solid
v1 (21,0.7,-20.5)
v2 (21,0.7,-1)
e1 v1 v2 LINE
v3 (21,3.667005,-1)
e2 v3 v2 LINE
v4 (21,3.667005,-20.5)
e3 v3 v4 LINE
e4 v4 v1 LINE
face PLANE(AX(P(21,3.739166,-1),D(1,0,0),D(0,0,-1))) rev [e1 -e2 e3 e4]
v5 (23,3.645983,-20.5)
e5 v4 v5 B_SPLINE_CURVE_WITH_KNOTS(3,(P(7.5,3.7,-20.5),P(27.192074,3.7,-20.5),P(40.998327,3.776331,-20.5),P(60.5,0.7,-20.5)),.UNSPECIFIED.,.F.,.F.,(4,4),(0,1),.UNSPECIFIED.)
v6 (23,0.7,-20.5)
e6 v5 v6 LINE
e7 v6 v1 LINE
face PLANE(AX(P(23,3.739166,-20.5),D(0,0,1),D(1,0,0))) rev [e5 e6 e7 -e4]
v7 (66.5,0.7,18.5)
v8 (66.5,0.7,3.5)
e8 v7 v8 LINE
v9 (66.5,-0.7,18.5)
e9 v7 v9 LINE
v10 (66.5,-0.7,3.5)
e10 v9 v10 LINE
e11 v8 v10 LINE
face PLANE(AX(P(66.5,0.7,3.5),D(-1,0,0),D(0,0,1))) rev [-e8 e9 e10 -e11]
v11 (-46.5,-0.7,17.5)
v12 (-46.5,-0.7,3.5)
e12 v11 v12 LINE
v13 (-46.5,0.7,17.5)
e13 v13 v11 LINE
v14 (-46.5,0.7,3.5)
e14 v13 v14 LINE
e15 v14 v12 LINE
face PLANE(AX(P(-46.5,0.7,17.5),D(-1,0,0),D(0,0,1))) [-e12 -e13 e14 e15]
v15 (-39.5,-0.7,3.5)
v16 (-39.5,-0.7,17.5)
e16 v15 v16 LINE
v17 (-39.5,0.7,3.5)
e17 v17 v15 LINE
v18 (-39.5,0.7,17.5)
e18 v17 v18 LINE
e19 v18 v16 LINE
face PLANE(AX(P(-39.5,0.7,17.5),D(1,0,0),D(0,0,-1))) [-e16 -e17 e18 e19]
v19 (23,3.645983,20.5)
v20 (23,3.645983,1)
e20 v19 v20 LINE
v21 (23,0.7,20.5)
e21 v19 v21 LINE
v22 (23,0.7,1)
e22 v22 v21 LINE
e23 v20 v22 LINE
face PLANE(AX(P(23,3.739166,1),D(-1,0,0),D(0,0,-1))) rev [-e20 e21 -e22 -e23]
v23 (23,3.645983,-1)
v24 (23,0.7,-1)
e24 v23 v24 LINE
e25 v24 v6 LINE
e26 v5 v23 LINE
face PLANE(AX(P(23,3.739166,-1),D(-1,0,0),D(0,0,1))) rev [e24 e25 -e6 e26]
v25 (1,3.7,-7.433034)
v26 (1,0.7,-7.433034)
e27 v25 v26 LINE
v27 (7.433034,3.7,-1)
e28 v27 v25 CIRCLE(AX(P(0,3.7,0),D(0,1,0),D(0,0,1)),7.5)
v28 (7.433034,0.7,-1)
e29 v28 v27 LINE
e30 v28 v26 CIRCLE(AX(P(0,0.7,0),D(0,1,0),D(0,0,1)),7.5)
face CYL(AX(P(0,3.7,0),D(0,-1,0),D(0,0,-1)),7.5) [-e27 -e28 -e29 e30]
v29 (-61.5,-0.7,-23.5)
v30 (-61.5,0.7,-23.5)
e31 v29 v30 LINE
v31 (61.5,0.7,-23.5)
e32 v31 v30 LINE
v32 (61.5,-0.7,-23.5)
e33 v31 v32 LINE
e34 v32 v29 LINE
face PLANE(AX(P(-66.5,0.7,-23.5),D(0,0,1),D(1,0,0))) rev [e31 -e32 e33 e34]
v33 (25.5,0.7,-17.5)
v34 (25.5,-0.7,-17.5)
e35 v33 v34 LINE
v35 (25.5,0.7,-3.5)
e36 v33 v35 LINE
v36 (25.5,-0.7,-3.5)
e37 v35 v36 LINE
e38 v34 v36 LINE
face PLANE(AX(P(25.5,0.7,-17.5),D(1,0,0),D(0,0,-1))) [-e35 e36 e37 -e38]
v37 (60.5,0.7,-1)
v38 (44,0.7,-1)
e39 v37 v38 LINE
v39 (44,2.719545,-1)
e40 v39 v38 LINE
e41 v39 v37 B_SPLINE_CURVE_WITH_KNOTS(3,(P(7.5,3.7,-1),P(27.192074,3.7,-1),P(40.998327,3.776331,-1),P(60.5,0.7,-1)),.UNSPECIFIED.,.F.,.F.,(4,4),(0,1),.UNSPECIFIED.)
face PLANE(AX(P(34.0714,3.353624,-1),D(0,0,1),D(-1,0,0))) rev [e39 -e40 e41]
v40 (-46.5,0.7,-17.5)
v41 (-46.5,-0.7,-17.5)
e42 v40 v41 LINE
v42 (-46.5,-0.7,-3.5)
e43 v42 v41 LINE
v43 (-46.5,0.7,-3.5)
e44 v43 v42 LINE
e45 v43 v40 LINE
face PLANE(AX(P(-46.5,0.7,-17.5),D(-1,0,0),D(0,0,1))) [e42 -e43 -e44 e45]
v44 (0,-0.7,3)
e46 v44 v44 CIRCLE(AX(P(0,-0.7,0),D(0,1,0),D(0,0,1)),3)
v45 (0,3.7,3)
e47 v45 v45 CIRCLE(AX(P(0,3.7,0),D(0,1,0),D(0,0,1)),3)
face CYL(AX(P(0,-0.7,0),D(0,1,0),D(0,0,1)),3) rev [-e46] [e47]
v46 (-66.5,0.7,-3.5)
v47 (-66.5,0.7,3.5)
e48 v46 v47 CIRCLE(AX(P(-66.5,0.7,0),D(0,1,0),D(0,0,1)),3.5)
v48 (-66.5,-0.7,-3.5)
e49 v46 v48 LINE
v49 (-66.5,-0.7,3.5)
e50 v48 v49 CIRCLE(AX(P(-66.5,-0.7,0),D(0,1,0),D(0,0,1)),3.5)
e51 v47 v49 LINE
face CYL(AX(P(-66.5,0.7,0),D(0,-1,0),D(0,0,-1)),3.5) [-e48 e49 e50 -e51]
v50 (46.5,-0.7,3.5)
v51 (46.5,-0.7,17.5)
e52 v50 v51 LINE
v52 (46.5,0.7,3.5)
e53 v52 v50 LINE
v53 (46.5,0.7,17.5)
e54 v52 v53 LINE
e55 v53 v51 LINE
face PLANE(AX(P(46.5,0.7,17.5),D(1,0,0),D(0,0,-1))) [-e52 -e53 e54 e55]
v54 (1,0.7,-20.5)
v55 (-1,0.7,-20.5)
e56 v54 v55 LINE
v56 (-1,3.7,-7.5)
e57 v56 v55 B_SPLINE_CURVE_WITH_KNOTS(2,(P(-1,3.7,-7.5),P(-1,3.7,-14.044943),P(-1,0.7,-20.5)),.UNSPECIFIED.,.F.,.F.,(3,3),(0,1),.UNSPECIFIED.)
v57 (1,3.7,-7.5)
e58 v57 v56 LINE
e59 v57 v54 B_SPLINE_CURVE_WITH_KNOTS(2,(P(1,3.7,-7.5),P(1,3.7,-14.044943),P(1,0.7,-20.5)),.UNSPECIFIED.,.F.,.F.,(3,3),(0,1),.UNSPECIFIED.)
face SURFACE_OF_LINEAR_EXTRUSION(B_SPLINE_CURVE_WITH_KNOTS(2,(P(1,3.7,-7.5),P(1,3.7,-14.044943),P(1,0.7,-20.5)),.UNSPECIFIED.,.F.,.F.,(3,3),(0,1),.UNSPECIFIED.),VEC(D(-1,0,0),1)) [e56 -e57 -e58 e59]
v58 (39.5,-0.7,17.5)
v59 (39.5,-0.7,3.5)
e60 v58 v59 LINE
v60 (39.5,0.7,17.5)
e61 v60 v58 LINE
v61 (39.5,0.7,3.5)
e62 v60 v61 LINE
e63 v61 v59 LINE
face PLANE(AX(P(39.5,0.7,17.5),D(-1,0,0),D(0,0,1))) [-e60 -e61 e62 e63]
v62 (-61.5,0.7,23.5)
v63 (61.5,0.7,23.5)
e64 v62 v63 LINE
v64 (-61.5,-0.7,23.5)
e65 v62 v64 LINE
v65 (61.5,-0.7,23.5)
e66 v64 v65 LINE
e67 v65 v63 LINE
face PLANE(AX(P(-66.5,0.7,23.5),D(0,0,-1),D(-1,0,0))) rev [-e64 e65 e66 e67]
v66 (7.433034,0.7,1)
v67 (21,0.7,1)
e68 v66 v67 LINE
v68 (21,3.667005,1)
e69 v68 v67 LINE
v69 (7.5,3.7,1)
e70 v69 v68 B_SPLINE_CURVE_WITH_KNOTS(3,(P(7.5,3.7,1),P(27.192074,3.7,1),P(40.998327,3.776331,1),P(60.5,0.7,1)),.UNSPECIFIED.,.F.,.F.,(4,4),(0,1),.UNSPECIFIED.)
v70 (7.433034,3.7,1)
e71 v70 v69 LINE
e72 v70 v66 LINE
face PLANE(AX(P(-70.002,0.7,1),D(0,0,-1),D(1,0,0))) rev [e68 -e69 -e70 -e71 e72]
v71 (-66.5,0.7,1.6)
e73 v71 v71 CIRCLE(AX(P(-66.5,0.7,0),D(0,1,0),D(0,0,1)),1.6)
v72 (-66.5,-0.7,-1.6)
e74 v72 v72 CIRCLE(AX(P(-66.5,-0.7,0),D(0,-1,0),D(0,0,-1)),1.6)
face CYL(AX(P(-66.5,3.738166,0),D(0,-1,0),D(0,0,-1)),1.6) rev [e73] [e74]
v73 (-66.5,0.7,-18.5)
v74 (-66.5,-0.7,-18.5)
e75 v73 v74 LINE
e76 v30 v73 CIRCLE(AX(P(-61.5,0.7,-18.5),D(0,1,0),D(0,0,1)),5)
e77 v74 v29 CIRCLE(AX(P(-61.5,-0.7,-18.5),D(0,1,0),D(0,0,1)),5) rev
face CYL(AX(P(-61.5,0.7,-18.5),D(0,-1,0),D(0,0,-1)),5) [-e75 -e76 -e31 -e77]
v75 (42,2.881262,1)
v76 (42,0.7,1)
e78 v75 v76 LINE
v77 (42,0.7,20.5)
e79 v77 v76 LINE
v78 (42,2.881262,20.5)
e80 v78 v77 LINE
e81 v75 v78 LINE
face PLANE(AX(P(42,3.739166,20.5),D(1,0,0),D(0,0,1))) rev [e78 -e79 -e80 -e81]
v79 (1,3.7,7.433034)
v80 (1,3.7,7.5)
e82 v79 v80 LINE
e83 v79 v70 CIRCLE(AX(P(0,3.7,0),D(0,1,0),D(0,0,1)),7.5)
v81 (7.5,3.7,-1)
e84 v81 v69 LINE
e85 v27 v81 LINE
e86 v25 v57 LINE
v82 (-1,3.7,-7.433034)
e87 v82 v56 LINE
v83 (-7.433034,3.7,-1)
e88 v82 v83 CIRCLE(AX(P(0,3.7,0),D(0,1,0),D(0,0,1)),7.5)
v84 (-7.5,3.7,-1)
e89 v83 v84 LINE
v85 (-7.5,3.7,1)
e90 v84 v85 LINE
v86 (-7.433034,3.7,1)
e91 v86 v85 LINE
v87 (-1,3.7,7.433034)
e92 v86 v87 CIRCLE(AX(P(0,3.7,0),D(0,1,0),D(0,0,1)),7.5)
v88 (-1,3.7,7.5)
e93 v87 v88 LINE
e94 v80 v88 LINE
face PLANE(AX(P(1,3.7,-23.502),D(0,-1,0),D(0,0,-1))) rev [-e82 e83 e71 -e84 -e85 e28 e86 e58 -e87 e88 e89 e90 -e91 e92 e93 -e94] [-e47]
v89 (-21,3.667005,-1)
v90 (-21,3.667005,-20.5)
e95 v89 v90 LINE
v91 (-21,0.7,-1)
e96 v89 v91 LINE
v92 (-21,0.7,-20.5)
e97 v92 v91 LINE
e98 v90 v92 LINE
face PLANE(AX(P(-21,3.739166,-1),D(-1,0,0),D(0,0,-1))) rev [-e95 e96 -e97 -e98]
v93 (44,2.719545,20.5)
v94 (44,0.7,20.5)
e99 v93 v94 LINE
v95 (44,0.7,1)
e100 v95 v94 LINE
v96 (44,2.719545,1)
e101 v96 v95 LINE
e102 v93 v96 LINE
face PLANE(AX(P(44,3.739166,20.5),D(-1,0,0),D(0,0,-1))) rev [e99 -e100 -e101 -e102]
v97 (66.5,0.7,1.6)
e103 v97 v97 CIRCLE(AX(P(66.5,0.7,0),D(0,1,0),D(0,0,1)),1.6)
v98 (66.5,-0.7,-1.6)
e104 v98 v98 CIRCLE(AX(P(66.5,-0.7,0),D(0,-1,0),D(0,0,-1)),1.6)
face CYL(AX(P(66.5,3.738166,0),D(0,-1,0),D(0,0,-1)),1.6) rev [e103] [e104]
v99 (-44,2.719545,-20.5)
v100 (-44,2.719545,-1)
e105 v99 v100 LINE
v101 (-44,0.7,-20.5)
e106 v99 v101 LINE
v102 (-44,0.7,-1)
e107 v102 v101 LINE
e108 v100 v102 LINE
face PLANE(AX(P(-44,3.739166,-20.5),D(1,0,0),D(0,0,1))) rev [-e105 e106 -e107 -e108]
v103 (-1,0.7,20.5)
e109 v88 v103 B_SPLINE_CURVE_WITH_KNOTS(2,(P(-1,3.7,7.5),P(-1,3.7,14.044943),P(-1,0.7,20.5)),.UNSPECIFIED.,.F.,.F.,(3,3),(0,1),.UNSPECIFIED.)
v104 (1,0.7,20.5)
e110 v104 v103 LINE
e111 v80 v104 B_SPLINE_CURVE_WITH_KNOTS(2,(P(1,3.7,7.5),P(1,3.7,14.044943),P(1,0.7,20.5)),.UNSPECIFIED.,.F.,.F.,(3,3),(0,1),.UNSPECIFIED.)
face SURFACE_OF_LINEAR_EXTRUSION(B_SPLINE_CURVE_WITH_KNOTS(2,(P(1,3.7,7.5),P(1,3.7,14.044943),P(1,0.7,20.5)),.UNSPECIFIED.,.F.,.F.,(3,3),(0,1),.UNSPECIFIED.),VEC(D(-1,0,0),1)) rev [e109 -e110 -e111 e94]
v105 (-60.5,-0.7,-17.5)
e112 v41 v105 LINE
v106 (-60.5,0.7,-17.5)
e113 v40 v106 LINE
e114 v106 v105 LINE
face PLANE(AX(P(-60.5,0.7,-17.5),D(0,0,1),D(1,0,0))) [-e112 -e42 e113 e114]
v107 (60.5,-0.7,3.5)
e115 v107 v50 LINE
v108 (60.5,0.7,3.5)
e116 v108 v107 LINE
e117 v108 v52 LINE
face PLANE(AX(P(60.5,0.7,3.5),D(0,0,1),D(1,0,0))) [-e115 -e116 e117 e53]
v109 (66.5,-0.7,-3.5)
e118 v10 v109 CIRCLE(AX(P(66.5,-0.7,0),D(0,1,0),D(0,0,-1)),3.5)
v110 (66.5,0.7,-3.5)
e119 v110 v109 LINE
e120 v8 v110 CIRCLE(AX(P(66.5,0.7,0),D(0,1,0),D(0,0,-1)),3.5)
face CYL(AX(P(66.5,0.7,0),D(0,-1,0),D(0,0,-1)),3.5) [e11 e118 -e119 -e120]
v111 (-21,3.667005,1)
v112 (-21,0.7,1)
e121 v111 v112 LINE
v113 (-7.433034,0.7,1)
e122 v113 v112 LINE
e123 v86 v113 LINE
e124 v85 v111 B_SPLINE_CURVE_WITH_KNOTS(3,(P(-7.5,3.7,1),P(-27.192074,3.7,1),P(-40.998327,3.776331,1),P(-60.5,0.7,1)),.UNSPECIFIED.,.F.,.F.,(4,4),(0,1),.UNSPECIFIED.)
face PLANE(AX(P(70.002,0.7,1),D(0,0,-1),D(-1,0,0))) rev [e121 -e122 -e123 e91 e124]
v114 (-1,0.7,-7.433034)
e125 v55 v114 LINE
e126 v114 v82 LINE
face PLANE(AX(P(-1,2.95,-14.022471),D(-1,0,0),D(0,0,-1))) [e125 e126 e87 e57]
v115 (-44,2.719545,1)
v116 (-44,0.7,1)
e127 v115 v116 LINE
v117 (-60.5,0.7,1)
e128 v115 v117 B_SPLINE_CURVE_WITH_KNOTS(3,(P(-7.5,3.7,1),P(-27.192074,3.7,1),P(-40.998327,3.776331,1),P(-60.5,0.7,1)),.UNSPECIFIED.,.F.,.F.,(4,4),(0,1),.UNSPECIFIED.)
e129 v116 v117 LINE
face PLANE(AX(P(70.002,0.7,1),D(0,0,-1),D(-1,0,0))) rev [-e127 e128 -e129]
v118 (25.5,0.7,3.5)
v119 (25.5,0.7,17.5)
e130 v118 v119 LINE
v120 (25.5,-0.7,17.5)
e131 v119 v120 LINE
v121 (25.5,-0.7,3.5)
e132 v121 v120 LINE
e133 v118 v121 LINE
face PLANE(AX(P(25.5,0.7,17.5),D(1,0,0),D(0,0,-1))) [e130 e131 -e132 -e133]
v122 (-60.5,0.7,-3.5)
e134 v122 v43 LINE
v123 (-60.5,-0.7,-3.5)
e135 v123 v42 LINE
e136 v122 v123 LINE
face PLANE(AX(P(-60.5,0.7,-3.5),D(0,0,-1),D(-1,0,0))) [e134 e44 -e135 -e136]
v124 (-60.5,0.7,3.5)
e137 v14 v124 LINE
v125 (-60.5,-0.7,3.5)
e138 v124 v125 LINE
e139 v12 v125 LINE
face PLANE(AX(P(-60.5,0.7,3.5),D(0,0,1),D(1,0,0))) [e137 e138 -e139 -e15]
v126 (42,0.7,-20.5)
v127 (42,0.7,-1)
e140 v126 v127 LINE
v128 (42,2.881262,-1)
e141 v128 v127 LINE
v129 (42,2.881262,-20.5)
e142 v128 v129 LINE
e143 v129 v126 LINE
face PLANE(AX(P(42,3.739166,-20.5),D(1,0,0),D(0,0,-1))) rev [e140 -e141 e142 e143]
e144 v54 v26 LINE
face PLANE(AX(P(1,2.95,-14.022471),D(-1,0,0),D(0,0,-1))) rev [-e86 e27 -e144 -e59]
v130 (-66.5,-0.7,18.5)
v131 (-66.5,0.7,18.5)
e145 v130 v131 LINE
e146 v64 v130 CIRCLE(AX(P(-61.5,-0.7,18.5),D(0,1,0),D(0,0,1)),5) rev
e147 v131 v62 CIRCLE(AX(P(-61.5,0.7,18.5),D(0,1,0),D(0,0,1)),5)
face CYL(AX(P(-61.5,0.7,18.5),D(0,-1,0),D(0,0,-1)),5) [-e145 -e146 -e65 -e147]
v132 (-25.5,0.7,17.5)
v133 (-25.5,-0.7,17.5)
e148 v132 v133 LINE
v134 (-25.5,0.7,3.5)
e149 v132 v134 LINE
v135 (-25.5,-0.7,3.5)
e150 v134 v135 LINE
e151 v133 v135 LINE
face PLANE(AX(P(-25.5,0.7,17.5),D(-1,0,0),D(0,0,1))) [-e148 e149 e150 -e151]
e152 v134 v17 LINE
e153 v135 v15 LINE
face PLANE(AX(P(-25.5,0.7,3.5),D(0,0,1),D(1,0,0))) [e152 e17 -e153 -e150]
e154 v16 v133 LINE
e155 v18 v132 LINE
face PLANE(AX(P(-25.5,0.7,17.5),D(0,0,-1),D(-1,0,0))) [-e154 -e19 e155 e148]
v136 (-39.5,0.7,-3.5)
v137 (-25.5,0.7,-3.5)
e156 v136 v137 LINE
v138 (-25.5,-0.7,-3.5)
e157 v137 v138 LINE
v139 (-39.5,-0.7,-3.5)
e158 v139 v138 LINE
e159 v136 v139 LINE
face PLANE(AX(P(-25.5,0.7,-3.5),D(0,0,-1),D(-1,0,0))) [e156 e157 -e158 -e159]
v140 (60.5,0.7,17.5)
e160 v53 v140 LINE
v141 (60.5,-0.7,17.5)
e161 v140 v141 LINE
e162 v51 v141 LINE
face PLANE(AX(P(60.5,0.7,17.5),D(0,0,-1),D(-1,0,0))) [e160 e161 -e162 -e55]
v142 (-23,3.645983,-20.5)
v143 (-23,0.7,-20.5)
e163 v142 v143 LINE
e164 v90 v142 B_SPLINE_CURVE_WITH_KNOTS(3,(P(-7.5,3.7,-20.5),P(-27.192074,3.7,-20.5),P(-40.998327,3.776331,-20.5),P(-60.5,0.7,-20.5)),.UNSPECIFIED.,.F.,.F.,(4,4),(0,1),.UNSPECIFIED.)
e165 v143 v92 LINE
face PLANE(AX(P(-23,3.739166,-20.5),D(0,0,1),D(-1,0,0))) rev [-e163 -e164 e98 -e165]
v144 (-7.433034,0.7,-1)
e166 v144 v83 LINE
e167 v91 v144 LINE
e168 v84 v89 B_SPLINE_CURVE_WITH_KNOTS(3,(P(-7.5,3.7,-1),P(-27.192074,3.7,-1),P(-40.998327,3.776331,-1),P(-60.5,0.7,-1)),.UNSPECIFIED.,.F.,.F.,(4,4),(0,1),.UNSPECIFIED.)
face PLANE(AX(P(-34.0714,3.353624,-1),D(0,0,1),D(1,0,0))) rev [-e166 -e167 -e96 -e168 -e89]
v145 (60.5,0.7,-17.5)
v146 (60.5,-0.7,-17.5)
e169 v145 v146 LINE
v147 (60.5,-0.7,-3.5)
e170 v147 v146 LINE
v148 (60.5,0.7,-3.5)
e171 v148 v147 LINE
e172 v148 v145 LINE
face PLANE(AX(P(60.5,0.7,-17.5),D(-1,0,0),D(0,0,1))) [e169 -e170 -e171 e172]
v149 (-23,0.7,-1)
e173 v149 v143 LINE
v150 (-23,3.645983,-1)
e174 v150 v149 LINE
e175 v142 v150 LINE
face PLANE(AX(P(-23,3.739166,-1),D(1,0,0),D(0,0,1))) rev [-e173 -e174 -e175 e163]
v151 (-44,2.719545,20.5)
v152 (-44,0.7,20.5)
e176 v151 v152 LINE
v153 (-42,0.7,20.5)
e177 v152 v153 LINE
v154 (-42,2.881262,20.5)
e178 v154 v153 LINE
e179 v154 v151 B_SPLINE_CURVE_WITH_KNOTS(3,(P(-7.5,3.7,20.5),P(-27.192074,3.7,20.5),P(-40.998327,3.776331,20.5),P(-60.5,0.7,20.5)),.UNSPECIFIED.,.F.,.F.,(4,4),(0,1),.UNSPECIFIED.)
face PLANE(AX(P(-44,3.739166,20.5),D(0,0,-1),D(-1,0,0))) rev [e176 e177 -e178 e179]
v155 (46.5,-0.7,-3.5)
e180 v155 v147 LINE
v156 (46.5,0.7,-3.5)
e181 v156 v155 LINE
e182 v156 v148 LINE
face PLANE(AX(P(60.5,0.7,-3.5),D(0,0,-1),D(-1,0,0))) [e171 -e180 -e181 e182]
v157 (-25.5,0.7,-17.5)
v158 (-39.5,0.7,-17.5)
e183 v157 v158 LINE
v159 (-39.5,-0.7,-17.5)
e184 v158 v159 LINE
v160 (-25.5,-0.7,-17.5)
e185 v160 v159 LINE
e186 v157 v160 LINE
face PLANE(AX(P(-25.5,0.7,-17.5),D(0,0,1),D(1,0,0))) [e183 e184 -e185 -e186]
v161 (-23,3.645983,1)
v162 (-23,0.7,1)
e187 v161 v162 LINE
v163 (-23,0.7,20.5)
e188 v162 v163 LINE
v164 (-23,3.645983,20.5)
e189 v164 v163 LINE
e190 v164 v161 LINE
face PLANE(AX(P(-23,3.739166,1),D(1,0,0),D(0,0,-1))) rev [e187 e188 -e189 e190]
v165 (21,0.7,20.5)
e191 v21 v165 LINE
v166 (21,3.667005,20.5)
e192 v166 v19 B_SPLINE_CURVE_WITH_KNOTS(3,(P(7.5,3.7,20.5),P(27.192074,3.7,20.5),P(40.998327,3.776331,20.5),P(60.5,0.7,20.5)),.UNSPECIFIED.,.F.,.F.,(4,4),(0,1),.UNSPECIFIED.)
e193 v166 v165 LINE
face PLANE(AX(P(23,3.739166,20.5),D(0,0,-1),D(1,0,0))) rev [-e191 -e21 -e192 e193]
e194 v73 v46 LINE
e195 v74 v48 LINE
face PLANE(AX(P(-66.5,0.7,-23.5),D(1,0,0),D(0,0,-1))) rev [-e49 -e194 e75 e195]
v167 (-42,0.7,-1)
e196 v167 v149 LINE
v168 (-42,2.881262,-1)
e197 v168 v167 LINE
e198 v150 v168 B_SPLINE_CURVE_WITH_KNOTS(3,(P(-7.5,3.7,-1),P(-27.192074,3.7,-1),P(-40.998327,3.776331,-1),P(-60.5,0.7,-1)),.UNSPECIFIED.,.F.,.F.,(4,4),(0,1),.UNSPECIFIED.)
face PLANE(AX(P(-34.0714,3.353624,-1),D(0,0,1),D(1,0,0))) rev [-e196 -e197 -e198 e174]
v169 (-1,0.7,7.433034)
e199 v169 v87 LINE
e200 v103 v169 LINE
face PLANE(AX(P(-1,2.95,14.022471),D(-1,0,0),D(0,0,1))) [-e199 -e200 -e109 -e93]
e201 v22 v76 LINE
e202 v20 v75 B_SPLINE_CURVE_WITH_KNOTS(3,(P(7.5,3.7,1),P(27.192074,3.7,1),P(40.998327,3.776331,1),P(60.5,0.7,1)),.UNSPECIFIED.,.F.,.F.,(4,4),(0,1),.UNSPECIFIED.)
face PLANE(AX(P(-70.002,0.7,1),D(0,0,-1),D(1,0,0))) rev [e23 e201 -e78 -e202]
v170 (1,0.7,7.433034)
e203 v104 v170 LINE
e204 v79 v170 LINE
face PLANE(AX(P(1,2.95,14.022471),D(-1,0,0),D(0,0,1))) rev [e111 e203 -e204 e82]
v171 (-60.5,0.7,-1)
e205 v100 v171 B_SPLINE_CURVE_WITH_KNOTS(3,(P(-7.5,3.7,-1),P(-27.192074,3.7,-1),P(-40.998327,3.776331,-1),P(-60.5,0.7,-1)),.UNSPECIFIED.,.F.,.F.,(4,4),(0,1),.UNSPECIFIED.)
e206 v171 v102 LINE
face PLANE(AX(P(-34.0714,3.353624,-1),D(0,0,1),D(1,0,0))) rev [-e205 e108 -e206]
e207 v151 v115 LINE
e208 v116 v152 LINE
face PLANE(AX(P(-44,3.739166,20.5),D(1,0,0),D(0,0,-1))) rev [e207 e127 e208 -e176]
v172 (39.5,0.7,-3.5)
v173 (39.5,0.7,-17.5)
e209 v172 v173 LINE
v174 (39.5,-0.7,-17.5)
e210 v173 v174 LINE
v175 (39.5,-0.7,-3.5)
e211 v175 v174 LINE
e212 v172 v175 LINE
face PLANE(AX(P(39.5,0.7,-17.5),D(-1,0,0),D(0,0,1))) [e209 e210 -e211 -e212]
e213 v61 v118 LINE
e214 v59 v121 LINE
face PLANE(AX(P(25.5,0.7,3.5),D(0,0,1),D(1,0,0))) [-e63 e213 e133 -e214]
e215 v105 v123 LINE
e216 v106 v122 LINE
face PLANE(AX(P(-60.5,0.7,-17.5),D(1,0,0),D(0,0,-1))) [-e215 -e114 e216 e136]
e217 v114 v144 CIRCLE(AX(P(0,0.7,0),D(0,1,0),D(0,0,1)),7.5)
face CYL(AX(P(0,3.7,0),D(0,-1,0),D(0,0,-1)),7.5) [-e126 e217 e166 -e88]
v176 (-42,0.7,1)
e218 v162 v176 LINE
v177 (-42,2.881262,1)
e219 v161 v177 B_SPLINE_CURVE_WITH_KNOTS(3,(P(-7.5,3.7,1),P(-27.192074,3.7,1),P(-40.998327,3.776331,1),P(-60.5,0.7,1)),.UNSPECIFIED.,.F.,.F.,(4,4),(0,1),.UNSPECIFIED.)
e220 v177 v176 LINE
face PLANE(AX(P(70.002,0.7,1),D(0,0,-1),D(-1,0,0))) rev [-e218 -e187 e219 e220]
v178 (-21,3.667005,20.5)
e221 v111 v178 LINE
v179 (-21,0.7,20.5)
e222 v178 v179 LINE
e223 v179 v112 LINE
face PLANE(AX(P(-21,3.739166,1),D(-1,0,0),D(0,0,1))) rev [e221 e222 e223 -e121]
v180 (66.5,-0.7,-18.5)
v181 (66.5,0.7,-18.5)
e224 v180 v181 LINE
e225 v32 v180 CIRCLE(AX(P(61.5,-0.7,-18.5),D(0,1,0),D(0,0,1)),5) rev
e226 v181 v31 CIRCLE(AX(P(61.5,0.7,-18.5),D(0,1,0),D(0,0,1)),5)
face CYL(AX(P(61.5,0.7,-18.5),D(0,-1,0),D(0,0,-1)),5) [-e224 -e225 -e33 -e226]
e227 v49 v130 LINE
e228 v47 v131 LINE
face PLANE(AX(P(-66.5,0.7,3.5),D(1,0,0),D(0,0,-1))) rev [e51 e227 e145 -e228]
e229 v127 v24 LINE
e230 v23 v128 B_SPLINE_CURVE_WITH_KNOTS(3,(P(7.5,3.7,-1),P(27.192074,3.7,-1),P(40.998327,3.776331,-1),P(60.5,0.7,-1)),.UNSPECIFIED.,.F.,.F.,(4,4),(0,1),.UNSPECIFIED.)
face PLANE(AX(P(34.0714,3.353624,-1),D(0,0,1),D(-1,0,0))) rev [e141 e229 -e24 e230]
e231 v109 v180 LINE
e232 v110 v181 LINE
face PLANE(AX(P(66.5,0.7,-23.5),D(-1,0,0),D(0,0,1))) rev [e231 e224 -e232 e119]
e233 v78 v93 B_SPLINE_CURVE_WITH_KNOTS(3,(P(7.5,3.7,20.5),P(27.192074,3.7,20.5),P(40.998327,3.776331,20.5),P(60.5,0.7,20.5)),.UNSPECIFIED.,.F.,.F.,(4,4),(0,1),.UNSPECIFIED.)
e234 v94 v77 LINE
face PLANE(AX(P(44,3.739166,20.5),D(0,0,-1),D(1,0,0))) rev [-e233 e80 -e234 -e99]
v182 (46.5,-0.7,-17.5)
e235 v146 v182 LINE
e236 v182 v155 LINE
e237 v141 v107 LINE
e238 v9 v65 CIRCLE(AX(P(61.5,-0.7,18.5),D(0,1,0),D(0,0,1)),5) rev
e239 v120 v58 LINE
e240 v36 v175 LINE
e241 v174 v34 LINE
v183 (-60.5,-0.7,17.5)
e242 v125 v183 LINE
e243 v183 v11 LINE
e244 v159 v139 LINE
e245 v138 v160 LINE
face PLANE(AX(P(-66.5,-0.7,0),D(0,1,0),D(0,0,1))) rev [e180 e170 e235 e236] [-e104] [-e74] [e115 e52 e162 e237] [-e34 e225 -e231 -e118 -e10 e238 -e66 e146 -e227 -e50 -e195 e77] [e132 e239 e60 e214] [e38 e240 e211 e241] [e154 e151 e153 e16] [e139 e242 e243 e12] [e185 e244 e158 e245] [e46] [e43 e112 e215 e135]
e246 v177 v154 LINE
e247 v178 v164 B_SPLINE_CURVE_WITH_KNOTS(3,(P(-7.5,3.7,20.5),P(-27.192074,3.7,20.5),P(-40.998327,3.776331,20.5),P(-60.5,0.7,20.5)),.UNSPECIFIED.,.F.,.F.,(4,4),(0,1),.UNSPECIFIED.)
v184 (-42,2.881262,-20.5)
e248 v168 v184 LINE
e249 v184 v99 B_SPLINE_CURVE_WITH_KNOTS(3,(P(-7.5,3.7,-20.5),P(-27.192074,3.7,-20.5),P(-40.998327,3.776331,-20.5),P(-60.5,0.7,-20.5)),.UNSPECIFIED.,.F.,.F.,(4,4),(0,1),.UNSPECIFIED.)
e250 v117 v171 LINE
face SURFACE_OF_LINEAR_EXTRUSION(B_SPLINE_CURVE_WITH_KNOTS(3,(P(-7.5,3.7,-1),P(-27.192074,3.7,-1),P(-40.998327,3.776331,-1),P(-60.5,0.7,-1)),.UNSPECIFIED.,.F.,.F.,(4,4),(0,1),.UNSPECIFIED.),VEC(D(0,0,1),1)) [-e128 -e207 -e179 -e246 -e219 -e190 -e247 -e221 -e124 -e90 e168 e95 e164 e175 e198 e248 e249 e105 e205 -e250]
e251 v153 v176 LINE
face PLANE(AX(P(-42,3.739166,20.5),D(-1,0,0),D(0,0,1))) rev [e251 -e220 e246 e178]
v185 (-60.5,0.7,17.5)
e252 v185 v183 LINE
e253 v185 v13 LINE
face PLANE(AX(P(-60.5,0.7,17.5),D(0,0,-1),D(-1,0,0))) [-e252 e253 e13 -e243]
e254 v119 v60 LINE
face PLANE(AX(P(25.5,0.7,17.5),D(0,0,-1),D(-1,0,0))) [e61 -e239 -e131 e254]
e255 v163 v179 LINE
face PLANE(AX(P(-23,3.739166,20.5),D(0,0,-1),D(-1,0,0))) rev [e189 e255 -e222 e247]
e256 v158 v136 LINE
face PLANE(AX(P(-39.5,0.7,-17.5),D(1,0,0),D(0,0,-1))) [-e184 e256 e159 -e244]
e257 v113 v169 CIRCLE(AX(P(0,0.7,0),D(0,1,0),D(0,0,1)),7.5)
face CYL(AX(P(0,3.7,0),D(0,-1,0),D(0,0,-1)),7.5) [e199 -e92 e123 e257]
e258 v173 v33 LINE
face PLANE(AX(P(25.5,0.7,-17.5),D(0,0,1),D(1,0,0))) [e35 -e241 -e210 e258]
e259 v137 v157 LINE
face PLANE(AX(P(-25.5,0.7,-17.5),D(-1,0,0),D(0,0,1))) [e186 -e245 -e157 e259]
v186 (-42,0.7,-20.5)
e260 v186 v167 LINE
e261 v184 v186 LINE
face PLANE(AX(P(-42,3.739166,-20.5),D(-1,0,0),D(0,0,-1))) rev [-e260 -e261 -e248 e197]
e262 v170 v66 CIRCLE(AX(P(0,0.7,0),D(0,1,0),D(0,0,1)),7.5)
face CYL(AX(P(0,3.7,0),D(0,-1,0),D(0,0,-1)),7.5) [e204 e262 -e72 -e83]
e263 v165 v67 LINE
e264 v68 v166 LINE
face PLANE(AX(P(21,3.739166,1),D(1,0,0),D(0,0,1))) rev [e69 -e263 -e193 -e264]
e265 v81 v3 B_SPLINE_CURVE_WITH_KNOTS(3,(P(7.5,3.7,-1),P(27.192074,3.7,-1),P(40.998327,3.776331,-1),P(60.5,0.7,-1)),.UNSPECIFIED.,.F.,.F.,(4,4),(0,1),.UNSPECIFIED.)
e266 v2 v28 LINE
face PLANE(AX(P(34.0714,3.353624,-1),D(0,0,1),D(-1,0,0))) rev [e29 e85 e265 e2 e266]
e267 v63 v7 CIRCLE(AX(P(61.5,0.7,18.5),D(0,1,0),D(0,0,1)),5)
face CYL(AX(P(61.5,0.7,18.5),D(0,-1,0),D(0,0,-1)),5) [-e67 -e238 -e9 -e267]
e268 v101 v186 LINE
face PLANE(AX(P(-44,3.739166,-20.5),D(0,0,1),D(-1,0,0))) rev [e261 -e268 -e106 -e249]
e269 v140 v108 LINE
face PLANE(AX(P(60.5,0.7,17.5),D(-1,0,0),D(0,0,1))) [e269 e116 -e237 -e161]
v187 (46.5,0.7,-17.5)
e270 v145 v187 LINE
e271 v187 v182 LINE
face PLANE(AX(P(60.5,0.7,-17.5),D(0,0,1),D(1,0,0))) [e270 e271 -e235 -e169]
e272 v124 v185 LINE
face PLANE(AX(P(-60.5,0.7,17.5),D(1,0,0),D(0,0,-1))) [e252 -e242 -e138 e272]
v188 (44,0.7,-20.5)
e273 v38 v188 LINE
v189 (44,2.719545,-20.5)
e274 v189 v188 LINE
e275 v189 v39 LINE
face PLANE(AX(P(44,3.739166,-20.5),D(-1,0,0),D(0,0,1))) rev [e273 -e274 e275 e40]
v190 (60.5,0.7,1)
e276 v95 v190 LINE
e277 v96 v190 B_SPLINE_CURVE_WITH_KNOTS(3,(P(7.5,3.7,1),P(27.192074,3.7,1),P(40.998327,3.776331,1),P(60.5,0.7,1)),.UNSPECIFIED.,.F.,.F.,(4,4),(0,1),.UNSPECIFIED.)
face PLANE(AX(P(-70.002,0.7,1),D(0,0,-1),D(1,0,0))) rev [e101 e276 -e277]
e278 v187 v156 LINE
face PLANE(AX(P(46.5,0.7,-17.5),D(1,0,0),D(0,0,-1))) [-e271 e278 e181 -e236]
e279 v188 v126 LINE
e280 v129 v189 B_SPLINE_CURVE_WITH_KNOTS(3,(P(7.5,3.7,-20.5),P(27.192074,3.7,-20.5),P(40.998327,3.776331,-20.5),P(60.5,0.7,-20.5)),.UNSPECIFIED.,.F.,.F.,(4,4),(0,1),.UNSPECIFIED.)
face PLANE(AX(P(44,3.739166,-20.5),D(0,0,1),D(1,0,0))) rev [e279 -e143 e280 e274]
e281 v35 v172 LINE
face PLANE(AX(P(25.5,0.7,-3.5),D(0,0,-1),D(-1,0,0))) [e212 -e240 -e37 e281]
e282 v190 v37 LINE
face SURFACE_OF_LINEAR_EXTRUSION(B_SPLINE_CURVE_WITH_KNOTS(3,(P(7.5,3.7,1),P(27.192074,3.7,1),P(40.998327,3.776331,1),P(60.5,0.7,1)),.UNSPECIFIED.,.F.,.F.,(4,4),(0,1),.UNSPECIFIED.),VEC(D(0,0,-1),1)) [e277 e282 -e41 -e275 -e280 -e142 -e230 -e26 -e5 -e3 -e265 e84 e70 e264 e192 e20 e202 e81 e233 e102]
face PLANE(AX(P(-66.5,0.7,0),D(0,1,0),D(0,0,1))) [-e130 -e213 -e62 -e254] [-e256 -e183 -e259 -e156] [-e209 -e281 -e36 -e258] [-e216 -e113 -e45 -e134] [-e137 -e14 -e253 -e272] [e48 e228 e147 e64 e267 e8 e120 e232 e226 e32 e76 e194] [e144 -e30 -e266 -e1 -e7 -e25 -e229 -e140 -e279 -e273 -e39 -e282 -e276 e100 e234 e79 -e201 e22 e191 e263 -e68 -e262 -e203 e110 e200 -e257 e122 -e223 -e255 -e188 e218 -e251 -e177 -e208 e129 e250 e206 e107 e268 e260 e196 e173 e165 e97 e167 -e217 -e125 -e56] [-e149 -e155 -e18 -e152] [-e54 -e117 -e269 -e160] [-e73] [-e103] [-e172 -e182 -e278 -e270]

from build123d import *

# Parameters (mm, degrees)
SKETCH1_W            = 14
SKETCH1_H            = 14
BOSS_EXTRUDE1_DEPTH  = 0.7
SKETCH10_R           = 7.5
BOSS_EXTRUDE8_DEPTH  = 3
BOSS_EXTRUDE17_DEPTH = 1
SKETCH24_R           = 3
CUT_EXTRUDE5_DEPTH   = 74.970331891
SKETCH21_W           = 2
SKETCH21_H           = 3
BOSS_EXTRUDE20_DEPTH = 0.066966
BOSS_EXTRUDE22_DEPTH = 1
SKETCH26_W           = 2
SKETCH26_H           = 3
BOSS_EXTRUDE23_DEPTH = 0.066966
BOSS_EXTRUDE24_START = 1
BOSS_EXTRUDE24_DEPTH = 19.5
BOSS_EXTRUDE25_START = 1
BOSS_EXTRUDE25_DEPTH = 19.5
SKETCH30_R           = 1.6
CUT_EXTRUDE6_DEPTH   = 74.970342046
FILLET2_R            = 5


# Read off the part's stored shape, not the designer's step: Boss-Extrude24, Boss-Extrude25
with BuildPart() as part:
    # Sketch1 → Boss-Extrude1 (new, symmetric)
    with BuildSketch(Plane(origin=(0, 0, 0), x_dir=(1, 0, 0), z_dir=(0, 1, 0))):
        with BuildLine():
            Line((-66.5, 23.5), (66.5, 23.5))
            Line((66.5, 23.5), (66.5, 3.5))
            ThreePointArc((66.5, 3.5), (70, 0), (66.5, -3.5))
            Line((66.5, -3.5), (66.5, -23.5))
            Line((66.5, -23.5), (-66.5, -23.5))
            Line((-66.5, -23.5), (-66.5, -3.5))
            ThreePointArc((-66.5, -3.5), (-70, 0), (-66.5, 3.5))
            Line((-66.5, 3.5), (-66.5, 23.5))
        make_face()
        with Locations((-53.5, 10.5)):
            Rectangle(SKETCH1_W, SKETCH1_H, mode=Mode.SUBTRACT)
        with Locations((32.5, -10.5)):
            Rectangle(SKETCH1_W, SKETCH1_H, mode=Mode.SUBTRACT)
        with Locations((-53.5, -10.5)):
            Rectangle(SKETCH1_W, SKETCH1_H, mode=Mode.SUBTRACT)
        with Locations((-32.5, -10.5)):
            Rectangle(SKETCH1_W, SKETCH1_H, mode=Mode.SUBTRACT)
        with Locations((-32.5, 10.5)):
            Rectangle(SKETCH1_W, SKETCH1_H, mode=Mode.SUBTRACT)
        with Locations((53.5, -10.5)):
            Rectangle(SKETCH1_W, SKETCH1_H, mode=Mode.SUBTRACT)
        with Locations((32.5, 10.5)):
            Rectangle(SKETCH1_W, SKETCH1_H, mode=Mode.SUBTRACT)
        with Locations((53.5, 10.5)):
            Rectangle(SKETCH1_W, SKETCH1_H, mode=Mode.SUBTRACT)
    extrude(amount=BOSS_EXTRUDE1_DEPTH, both=True)

    # Sketch10 → Boss-Extrude8 (add)
    with BuildSketch(Plane(origin=(0, 0.7, 0), x_dir=(1, 0, 0), z_dir=(0, 1, 0))):
        with Locations(Location((0, 0, 0), (0, 0, 270))):
            Circle(SKETCH10_R)
    extrude(amount=BOSS_EXTRUDE8_DEPTH)

    # Sketch24 → Cut-Extrude5 (cut, through all)
    with BuildSketch(Plane(origin=(0, 3.7, 0), x_dir=(1, 0, 0), z_dir=(0, 1, 0))):
        with Locations(Location((0, 0, 0), (0, 0, 270))):
            Circle(SKETCH24_R)
    extrude(amount=-CUT_EXTRUDE5_DEPTH, mode=Mode.SUBTRACT)



with BuildPart() as body_2:
    # Sketch20 → Boss-Extrude17 (new, symmetric)
    with BuildSketch(Plane(origin=(0, 0, 0), x_dir=(0, 0, -1), z_dir=(1, 0, 0))):
        with BuildLine():
            Line((-7.5, 0.7), (-20.5, 0.7))
            add(Edge.make_bspline(
                [(-7.5, 3.7), (-14.044942682, 3.7), (-20.5, 0.7)],
                knots=[0, 0, 0, 1, 1, 1], degree=2))
            Line((-7.5, 3.7), (-7.5, 0.7))
        make_face()
    extrude(amount=BOSS_EXTRUDE17_DEPTH, both=True)


with BuildPart() as part_1:
    add(part.part)

    add(body_2.part)  # Boss-Extrude20 merges body 2
    # Sketch21 → Boss-Extrude20 (add)
    with BuildSketch(Plane(origin=(0, 0, 7.5), x_dir=(-1, 0, 0), z_dir=(0, 0, -1))):
        with Locations((0, 2.2)):
            Rectangle(SKETCH21_W, SKETCH21_H)
    extrude(amount=BOSS_EXTRUDE20_DEPTH)

    # Mirror8: part across plane


with BuildPart() as part_2:
    add(part_1.part)
    add(part_1.part.mirror(Plane.XY))



with BuildPart() as body_2_2:
    # Sketch15 → Boss-Extrude22 (new, symmetric)
    with BuildSketch(Plane.XY):
        with BuildLine():
            Line((-7.5, 0.7), (-7.5, 3.7))
            add(Edge.make_bspline(
                [(-60.5, 0.7), (-40.998326872, 3.776331264), (-27.192073984, 3.7), (-7.5, 3.7)],
                knots=[0, 0, 0, 0, 1, 1, 1, 1], degree=3))
            Line((-60.5, 0.7), (-7.5, 0.7))
        make_face()
    extrude(amount=BOSS_EXTRUDE22_DEPTH, both=True)


with BuildPart() as part_3:
    add(part_2.part)

    add(body_2_2.part)  # Boss-Extrude23 merges body 2 2
    # Sketch26 → Boss-Extrude23 (add)
    with BuildSketch(Plane(origin=(-7.5, 0, 0), x_dir=(0, 0, -1), z_dir=(1, 0, 0))):
        with Locations((0, 2.2)):
            Rectangle(SKETCH26_W, SKETCH26_H)
    extrude(amount=BOSS_EXTRUDE23_DEPTH)


with BuildPart() as body_2_3:
    # Boss-Extrude24 outline → Boss-Extrude24 (new body)
    with BuildSketch(Plane.XY.offset(BOSS_EXTRUDE24_START)):
        with BuildLine():
            Line((-42, 0.7), (-41.999999997, 2.881262224))
            add(Edge.make_bspline(
                [(-41.999999997, 2.881262224), (-42.663786895, 2.830556642), (-43.330222071, 2.776715505), (-44, 2.719545184)],
                knots=[0.657479323, 0.657479323, 0.657479323, 0.657479323, 0.696620492, 0.696620492, 0.696620492, 0.696620492], degree=3))
            Line((-44, 2.719545184), (-44, 0.7))
            Line((-44, 0.7), (-42, 0.7))
        make_face()
    extrude(amount=BOSS_EXTRUDE24_DEPTH)


with BuildPart() as body_3:
    # Mirror9: mirrored copy
    add(body_2_3.part.mirror(Plane.XY))


with BuildPart() as body_4:
    # Boss-Extrude25 outline → Boss-Extrude25 (new body)
    with BuildSketch(Plane.XY.offset(BOSS_EXTRUDE25_START)):
        with BuildLine():
            Line((-21, 0.7), (-21, 3.667005238))
            add(Edge.make_bspline(
                [(-21, 3.667005238), (-21.670951218, 3.66109998), (-22.337400803, 3.65415318), (-23.000000006, 3.645983261)],
                knots=[0.243398828, 0.243398828, 0.243398828, 0.243398828, 0.281710487, 0.281710487, 0.281710487, 0.281710487], degree=3))
            Line((-23.000000006, 3.645983261), (-23, 0.7))
            Line((-23, 0.7), (-21, 0.7))
        make_face()
    extrude(amount=BOSS_EXTRUDE25_DEPTH)


with BuildPart() as body_5:
    # Mirror10: mirrored copy
    add(body_4.part.mirror(Plane.XY))


with BuildPart() as body_6:
    # Mirror17: mirrored copy
    add(part_3.part.mirror(Plane(origin=(0, 0, 0), x_dir=(0, 0, 1), z_dir=(1, 0, 0))))


with BuildPart() as body_7:
    # Mirror17 2: mirrored copy
    add(body_4.part.mirror(Plane(origin=(0, 0, 0), x_dir=(0, 0, 1), z_dir=(1, 0, 0))))


with BuildPart() as body_8:
    # Mirror17 3: mirrored copy
    add(body_5.part.mirror(Plane(origin=(0, 0, 0), x_dir=(0, 0, 1), z_dir=(1, 0, 0))))


with BuildPart() as body_9:
    # Mirror17 4: mirrored copy
    add(body_3.part.mirror(Plane(origin=(0, 0, 0), x_dir=(0, 0, 1), z_dir=(1, 0, 0))))


with BuildPart() as body_10:
    # Mirror17 5: mirrored copy
    add(body_2_3.part.mirror(Plane(origin=(0, 0, 0), x_dir=(0, 0, 1), z_dir=(1, 0, 0))))


with BuildPart() as cut_extrude6_tool:
    # Sketch30 → Cut-Extrude6 (new, through all)
    with BuildSketch(Plane.XZ.offset(0.7)):
        with Locations(Location((-66.5, 0, 0), (0, 0, 270))):
            Circle(SKETCH30_R)
        with Locations(Location((66.5, 0, 0), (0, 0, 270))):
            Circle(SKETCH30_R)
    extrude(amount=-CUT_EXTRUDE6_DEPTH)


with BuildPart() as part_4:
    add(part_3.part)

    # Cut-Extrude6: cut by cut_extrude6_tool
    add(cut_extrude6_tool.part, mode=Mode.SUBTRACT)


with BuildPart() as body_6_1:
    add(body_6.part)

    # Cut-Extrude6: cut by cut_extrude6_tool
    add(cut_extrude6_tool.part, mode=Mode.SUBTRACT)


with BuildPart() as body_7_1:
    add(body_7.part)

    # Combine1: union body 3, body 10, body 4, part, body 2 3, body 9, body 6, body 8, body 5
    add(body_3.part)
    add(body_10.part)
    add(body_4.part)
    add(part_4.part)
    add(body_2_3.part)
    add(body_9.part)
    add(body_6_1.part)
    add(body_8.part)
    add(body_5.part)

    # Fillet2
    fillet2_edges = [body_7_1.edges().sort_by_distance(p)[0] for p in [
        (-66.5, 0, -23.5),
        (-66.5, 0, 23.5),
        (66.5, 0, 23.5),
        (66.5, 0, -23.5),
    ]]
    fillet(fillet2_edges, radius=FILLET2_R)


solid = body_7_1.part
